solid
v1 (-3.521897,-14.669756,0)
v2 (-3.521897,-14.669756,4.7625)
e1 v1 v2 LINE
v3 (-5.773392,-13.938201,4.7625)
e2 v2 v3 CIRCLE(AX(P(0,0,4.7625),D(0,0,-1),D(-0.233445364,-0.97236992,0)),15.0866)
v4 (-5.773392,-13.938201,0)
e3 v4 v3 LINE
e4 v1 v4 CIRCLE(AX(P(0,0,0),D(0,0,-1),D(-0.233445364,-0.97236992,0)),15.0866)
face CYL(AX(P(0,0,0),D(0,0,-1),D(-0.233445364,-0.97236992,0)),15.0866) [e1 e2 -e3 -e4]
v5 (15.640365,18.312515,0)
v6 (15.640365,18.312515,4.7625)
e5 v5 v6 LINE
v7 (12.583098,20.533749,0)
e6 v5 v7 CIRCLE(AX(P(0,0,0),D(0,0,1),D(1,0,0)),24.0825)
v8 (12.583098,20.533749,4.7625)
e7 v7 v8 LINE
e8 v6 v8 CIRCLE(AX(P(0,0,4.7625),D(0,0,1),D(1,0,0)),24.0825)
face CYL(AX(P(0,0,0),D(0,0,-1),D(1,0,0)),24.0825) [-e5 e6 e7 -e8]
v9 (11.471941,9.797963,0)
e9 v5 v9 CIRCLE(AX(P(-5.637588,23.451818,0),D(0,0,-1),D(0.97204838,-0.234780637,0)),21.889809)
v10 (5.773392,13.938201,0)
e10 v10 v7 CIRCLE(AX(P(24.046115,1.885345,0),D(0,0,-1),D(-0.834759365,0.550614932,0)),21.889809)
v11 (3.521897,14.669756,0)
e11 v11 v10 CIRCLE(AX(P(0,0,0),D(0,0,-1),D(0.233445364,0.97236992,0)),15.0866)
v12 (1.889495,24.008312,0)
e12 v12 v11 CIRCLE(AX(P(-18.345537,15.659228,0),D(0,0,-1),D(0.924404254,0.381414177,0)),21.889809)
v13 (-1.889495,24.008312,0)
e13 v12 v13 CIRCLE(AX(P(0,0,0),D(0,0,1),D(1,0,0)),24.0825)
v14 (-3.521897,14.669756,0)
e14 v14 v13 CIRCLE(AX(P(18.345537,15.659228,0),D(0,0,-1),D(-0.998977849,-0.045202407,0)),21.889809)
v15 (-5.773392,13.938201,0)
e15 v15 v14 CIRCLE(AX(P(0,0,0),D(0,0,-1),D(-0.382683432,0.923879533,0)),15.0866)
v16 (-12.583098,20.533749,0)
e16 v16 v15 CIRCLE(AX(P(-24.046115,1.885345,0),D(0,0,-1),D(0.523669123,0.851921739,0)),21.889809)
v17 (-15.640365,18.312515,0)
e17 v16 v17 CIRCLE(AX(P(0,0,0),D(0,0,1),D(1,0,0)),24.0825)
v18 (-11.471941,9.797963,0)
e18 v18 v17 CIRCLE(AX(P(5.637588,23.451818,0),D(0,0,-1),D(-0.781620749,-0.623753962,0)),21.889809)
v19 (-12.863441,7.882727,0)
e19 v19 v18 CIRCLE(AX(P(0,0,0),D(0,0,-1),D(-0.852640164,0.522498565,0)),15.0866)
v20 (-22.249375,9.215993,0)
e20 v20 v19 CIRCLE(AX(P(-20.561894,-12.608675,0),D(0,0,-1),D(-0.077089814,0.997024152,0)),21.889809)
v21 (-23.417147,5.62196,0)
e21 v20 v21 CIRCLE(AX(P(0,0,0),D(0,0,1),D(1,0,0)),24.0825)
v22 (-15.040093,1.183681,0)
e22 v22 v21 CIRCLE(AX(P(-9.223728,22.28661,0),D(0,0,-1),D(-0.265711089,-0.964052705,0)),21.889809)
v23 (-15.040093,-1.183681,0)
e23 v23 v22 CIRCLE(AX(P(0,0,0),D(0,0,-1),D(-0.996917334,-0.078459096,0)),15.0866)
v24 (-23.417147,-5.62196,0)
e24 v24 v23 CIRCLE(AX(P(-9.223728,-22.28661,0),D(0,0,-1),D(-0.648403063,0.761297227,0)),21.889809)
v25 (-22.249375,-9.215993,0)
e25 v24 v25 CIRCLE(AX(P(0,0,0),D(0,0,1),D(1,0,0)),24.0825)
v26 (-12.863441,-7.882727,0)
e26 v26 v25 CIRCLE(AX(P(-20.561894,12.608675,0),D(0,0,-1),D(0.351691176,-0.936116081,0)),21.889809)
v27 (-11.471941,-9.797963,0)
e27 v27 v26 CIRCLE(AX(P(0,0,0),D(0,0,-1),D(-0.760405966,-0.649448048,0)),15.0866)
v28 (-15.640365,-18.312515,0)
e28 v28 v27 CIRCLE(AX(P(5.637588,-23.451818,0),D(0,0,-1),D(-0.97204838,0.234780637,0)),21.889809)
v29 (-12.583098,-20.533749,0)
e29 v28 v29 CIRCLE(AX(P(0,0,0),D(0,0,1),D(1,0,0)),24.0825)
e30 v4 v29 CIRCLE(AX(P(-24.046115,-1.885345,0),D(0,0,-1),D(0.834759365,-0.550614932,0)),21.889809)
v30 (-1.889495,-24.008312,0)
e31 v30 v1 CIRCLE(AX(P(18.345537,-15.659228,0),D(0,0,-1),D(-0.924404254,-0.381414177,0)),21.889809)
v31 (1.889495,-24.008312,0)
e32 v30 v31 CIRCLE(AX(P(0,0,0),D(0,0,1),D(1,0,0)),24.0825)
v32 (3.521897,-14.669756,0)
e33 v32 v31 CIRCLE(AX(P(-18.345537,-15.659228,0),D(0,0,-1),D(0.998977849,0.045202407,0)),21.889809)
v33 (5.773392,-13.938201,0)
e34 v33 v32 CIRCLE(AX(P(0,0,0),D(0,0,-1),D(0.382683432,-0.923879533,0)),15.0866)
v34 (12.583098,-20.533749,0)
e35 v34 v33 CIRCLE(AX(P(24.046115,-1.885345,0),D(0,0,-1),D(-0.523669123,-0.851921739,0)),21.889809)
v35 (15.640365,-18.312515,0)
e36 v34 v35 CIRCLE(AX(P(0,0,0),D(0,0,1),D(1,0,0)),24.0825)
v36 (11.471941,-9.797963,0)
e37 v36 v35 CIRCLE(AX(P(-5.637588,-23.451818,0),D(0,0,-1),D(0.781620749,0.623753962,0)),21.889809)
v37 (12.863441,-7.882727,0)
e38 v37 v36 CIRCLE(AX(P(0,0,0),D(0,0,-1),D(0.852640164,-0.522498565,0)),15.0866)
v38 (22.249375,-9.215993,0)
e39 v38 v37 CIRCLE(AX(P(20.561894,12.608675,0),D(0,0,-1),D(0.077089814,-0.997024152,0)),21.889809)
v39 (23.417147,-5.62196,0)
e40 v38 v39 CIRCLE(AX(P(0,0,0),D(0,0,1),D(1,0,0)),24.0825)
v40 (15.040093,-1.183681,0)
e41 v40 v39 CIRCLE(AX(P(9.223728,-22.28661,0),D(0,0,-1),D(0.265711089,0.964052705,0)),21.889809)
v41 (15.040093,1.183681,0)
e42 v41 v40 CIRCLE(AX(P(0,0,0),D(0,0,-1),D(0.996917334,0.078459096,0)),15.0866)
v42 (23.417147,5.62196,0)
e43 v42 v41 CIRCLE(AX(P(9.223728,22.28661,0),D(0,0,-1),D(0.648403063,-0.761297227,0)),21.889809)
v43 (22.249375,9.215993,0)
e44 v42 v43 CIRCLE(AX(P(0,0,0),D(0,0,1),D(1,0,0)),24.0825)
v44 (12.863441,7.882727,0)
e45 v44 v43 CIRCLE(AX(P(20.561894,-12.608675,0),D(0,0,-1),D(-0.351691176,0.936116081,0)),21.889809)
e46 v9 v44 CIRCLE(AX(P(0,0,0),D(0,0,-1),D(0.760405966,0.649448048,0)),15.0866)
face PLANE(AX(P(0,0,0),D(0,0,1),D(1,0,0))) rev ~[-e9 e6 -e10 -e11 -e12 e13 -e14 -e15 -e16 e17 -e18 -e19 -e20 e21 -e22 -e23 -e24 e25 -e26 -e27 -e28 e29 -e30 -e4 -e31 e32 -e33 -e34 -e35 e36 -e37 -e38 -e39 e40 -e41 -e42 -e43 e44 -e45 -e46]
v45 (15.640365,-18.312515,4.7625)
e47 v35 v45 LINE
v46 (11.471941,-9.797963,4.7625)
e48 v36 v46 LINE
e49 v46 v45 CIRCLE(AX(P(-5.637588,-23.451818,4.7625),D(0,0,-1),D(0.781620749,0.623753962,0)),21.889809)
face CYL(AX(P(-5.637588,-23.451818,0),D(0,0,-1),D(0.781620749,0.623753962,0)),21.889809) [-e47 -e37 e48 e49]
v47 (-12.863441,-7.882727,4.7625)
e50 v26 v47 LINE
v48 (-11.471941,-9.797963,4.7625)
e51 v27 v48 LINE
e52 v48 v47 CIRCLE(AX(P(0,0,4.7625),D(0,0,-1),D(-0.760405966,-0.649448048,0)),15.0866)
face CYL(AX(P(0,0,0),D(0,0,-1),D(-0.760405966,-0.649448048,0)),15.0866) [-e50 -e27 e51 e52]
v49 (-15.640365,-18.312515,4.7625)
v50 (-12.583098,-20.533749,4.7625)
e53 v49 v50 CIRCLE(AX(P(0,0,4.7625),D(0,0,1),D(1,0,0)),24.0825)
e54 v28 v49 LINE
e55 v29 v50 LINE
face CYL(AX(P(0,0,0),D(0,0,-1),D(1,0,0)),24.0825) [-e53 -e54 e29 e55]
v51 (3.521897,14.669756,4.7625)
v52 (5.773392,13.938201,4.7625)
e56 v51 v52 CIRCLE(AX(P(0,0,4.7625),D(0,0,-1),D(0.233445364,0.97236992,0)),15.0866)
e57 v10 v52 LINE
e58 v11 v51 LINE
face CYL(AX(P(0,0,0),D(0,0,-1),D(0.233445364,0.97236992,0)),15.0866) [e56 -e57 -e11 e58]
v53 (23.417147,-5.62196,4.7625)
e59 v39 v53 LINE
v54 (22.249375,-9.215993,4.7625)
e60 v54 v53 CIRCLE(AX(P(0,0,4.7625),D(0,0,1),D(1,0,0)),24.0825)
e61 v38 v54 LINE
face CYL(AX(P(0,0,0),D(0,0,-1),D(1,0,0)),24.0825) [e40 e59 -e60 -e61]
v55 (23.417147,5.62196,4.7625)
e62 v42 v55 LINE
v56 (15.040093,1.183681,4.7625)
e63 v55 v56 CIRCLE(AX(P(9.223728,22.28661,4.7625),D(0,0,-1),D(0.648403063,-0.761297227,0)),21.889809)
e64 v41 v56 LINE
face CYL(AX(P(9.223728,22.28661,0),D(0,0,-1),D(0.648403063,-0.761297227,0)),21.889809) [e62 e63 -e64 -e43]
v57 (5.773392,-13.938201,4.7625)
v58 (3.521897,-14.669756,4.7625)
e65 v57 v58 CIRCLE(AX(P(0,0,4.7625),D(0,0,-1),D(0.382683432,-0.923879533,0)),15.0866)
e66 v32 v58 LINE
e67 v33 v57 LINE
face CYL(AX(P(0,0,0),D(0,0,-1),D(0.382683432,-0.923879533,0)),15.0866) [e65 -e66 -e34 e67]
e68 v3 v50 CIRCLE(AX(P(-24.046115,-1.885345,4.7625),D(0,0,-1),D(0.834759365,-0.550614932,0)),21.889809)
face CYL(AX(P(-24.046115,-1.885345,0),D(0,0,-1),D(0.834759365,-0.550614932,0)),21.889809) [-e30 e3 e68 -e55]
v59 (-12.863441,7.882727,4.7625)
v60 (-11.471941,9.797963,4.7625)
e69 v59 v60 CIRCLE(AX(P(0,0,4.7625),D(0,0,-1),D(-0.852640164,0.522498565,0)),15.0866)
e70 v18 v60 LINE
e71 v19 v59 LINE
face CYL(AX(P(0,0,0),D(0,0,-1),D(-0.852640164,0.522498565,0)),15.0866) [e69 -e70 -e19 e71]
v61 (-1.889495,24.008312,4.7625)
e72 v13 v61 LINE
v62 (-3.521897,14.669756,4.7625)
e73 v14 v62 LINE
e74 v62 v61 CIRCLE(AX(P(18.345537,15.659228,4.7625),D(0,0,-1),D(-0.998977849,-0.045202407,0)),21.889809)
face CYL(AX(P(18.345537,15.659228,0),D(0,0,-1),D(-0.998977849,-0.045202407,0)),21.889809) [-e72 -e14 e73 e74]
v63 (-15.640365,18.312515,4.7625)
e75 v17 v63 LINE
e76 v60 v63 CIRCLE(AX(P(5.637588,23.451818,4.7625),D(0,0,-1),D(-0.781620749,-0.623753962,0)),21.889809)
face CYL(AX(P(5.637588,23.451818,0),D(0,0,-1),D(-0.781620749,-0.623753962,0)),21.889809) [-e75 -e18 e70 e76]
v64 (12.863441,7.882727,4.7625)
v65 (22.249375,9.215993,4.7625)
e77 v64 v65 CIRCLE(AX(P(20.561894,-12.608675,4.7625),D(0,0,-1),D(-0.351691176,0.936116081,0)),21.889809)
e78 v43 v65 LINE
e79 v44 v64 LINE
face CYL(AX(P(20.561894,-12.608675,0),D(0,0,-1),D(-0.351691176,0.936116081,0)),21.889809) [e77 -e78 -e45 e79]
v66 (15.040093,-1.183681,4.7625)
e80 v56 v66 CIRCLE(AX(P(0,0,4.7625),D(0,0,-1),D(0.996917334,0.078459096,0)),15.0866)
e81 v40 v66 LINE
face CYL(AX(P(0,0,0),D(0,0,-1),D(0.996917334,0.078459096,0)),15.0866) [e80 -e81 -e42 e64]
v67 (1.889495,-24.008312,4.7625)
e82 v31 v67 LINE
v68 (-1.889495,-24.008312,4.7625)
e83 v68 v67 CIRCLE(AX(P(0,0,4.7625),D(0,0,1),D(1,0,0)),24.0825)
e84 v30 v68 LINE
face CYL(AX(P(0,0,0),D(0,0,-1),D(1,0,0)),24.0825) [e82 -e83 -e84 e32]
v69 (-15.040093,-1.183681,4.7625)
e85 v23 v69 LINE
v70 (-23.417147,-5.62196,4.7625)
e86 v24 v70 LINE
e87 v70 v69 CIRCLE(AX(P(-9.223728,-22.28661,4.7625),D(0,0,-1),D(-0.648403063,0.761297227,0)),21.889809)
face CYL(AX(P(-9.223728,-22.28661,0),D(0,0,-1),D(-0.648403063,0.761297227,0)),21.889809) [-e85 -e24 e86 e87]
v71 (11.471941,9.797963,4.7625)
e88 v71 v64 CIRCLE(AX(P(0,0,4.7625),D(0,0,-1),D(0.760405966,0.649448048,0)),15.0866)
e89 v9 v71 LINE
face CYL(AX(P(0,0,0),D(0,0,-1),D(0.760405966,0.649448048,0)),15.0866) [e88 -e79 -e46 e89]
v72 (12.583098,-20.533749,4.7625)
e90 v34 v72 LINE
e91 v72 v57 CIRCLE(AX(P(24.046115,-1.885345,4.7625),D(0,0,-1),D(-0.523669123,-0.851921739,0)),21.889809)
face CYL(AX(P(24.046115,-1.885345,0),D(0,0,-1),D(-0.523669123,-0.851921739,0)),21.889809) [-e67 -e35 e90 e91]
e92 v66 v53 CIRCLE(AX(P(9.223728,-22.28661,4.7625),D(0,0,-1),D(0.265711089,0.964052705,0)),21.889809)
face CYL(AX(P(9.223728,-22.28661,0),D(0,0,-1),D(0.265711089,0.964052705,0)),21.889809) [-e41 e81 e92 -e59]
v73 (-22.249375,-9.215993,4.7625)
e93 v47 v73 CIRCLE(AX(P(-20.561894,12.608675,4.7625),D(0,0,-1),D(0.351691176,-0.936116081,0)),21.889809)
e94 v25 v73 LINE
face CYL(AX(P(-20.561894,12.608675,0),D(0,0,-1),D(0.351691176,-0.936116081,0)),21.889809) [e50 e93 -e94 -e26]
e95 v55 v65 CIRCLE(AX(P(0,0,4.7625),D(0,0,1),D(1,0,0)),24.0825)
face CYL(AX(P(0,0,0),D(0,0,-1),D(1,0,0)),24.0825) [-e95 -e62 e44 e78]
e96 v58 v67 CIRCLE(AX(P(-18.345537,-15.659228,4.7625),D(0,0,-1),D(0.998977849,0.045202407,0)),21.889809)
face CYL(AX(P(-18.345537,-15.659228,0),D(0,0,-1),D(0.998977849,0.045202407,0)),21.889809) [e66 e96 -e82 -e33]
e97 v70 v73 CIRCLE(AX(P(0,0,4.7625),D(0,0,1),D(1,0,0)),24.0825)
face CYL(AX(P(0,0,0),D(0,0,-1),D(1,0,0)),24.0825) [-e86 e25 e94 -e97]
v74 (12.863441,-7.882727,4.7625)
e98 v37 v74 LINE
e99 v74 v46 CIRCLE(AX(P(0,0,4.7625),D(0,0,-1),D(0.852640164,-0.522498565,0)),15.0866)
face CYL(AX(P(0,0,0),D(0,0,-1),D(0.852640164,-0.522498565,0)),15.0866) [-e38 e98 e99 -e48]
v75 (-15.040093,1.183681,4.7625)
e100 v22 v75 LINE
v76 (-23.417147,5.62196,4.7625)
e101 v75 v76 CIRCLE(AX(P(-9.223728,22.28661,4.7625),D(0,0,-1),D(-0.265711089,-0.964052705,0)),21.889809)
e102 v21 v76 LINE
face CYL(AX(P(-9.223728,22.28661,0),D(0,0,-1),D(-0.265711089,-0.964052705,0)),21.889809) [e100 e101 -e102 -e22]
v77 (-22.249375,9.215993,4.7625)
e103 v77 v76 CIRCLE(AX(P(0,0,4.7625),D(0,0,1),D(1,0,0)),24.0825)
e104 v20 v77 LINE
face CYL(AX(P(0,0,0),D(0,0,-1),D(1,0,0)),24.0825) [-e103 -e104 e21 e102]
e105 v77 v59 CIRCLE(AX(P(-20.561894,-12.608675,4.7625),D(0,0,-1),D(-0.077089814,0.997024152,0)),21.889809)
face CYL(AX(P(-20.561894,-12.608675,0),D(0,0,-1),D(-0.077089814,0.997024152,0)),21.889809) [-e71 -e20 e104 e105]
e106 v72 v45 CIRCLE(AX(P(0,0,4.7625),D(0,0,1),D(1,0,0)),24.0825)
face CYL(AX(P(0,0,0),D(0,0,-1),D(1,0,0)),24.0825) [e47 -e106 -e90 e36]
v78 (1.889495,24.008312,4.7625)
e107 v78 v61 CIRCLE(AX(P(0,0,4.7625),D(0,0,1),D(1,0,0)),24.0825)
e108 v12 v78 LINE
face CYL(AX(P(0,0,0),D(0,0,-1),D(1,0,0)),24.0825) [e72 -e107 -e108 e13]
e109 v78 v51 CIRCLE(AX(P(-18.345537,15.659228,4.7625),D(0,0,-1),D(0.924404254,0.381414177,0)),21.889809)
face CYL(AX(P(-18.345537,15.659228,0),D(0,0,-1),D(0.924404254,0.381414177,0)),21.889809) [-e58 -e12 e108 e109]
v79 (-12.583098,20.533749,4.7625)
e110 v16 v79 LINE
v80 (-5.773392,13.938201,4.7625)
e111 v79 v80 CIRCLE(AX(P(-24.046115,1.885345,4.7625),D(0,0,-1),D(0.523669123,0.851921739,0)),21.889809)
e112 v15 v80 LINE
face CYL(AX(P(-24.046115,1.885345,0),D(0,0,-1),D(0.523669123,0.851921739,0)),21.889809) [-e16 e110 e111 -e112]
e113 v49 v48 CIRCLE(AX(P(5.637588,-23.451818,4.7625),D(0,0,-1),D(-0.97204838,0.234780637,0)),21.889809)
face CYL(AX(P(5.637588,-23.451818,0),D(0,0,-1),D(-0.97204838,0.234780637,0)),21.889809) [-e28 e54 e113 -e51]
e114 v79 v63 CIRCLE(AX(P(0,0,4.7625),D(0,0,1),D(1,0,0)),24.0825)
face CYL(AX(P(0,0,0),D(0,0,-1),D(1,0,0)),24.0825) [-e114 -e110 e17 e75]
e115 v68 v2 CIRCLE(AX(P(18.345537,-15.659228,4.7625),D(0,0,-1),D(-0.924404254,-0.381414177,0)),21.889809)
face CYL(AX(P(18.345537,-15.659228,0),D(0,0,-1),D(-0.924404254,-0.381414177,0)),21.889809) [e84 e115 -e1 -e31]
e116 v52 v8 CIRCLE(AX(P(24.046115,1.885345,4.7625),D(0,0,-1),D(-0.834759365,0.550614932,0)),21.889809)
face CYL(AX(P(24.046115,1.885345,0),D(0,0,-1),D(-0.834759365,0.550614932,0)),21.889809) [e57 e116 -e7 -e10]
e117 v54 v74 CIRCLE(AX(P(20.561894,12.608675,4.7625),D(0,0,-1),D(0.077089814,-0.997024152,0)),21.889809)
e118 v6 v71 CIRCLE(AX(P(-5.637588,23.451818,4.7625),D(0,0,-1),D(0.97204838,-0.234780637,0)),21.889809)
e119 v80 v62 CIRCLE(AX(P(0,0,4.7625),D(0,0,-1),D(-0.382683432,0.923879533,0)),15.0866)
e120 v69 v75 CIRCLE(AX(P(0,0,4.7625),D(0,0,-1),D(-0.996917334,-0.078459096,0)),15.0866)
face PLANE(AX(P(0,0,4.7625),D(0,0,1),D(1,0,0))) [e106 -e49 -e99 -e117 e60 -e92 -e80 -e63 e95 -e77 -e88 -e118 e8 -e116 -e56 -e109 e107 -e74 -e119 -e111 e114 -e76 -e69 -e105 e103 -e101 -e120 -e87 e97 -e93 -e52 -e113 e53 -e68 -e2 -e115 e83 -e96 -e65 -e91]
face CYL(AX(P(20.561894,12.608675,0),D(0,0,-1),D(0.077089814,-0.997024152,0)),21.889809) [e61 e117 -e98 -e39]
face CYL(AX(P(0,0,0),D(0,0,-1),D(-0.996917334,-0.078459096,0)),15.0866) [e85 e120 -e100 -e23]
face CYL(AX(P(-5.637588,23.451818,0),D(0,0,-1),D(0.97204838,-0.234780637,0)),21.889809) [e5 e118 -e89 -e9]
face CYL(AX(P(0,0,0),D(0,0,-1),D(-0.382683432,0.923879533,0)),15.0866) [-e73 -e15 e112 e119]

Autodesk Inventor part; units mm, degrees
sketch "Sketch1" plane through (0, 0, 0) normal (0, 0, 1) x (1, 0, 0)
  circle A0 centre (0, 0) radius 24.0825
  dimension "d0" = 48.1651
extrude "Extrusion1" add sketch "Sketch1" along normal blind 4.7625
sketch "Sketch2" plane through (0, 0, 0) normal (0, 0, -1) x (-1, 0, 0)
  circle A0 centre (0, 0) radius 24.0825 projected
  circle A1 centre (0, 0) radius 20
  dimension "d3" = 40
surface extrude "Pitch Diameter" sketch "Sketch2" against normal through all shown no curves A1
ref_plane "Work Plane1" through (0, 0, 0) normal (1, 0, 0) x (0, 1, 0)
ref_plane "Work Plane2" through (0, 0, 0) normal (0.9510565, 0.309017, 0) x (0, 0, 1)
ref_plane "Work Plane3" through (0, 0, 2.3813) normal (0, 0, -1) x (-1, 0, 0)
spur gear teeth "Spur Gear" teeth 10 pitch diameter 40 tip diameter 48.1651 root diameter 30.1732 face width 4.7625 start plane through (0, 0, 0) normal (0, 0, -1) x (-1, 0, 0)
equation "\"d0\" = da_da"
equation "\"d1\" = da_b"
equation "\"d3\" = da_d"
equation "\"d15\" = da_aw"
equation "\"d19\" = da_aw"
equation "\"da_da\" = 48.165053"
equation "\"da_b\" = 4.7625"
equation "\"da_d\" = 40"
equation "\"da_aw\" = 60.255685"
properties part number "DRIVEN,INTAKE" material "Steel"
